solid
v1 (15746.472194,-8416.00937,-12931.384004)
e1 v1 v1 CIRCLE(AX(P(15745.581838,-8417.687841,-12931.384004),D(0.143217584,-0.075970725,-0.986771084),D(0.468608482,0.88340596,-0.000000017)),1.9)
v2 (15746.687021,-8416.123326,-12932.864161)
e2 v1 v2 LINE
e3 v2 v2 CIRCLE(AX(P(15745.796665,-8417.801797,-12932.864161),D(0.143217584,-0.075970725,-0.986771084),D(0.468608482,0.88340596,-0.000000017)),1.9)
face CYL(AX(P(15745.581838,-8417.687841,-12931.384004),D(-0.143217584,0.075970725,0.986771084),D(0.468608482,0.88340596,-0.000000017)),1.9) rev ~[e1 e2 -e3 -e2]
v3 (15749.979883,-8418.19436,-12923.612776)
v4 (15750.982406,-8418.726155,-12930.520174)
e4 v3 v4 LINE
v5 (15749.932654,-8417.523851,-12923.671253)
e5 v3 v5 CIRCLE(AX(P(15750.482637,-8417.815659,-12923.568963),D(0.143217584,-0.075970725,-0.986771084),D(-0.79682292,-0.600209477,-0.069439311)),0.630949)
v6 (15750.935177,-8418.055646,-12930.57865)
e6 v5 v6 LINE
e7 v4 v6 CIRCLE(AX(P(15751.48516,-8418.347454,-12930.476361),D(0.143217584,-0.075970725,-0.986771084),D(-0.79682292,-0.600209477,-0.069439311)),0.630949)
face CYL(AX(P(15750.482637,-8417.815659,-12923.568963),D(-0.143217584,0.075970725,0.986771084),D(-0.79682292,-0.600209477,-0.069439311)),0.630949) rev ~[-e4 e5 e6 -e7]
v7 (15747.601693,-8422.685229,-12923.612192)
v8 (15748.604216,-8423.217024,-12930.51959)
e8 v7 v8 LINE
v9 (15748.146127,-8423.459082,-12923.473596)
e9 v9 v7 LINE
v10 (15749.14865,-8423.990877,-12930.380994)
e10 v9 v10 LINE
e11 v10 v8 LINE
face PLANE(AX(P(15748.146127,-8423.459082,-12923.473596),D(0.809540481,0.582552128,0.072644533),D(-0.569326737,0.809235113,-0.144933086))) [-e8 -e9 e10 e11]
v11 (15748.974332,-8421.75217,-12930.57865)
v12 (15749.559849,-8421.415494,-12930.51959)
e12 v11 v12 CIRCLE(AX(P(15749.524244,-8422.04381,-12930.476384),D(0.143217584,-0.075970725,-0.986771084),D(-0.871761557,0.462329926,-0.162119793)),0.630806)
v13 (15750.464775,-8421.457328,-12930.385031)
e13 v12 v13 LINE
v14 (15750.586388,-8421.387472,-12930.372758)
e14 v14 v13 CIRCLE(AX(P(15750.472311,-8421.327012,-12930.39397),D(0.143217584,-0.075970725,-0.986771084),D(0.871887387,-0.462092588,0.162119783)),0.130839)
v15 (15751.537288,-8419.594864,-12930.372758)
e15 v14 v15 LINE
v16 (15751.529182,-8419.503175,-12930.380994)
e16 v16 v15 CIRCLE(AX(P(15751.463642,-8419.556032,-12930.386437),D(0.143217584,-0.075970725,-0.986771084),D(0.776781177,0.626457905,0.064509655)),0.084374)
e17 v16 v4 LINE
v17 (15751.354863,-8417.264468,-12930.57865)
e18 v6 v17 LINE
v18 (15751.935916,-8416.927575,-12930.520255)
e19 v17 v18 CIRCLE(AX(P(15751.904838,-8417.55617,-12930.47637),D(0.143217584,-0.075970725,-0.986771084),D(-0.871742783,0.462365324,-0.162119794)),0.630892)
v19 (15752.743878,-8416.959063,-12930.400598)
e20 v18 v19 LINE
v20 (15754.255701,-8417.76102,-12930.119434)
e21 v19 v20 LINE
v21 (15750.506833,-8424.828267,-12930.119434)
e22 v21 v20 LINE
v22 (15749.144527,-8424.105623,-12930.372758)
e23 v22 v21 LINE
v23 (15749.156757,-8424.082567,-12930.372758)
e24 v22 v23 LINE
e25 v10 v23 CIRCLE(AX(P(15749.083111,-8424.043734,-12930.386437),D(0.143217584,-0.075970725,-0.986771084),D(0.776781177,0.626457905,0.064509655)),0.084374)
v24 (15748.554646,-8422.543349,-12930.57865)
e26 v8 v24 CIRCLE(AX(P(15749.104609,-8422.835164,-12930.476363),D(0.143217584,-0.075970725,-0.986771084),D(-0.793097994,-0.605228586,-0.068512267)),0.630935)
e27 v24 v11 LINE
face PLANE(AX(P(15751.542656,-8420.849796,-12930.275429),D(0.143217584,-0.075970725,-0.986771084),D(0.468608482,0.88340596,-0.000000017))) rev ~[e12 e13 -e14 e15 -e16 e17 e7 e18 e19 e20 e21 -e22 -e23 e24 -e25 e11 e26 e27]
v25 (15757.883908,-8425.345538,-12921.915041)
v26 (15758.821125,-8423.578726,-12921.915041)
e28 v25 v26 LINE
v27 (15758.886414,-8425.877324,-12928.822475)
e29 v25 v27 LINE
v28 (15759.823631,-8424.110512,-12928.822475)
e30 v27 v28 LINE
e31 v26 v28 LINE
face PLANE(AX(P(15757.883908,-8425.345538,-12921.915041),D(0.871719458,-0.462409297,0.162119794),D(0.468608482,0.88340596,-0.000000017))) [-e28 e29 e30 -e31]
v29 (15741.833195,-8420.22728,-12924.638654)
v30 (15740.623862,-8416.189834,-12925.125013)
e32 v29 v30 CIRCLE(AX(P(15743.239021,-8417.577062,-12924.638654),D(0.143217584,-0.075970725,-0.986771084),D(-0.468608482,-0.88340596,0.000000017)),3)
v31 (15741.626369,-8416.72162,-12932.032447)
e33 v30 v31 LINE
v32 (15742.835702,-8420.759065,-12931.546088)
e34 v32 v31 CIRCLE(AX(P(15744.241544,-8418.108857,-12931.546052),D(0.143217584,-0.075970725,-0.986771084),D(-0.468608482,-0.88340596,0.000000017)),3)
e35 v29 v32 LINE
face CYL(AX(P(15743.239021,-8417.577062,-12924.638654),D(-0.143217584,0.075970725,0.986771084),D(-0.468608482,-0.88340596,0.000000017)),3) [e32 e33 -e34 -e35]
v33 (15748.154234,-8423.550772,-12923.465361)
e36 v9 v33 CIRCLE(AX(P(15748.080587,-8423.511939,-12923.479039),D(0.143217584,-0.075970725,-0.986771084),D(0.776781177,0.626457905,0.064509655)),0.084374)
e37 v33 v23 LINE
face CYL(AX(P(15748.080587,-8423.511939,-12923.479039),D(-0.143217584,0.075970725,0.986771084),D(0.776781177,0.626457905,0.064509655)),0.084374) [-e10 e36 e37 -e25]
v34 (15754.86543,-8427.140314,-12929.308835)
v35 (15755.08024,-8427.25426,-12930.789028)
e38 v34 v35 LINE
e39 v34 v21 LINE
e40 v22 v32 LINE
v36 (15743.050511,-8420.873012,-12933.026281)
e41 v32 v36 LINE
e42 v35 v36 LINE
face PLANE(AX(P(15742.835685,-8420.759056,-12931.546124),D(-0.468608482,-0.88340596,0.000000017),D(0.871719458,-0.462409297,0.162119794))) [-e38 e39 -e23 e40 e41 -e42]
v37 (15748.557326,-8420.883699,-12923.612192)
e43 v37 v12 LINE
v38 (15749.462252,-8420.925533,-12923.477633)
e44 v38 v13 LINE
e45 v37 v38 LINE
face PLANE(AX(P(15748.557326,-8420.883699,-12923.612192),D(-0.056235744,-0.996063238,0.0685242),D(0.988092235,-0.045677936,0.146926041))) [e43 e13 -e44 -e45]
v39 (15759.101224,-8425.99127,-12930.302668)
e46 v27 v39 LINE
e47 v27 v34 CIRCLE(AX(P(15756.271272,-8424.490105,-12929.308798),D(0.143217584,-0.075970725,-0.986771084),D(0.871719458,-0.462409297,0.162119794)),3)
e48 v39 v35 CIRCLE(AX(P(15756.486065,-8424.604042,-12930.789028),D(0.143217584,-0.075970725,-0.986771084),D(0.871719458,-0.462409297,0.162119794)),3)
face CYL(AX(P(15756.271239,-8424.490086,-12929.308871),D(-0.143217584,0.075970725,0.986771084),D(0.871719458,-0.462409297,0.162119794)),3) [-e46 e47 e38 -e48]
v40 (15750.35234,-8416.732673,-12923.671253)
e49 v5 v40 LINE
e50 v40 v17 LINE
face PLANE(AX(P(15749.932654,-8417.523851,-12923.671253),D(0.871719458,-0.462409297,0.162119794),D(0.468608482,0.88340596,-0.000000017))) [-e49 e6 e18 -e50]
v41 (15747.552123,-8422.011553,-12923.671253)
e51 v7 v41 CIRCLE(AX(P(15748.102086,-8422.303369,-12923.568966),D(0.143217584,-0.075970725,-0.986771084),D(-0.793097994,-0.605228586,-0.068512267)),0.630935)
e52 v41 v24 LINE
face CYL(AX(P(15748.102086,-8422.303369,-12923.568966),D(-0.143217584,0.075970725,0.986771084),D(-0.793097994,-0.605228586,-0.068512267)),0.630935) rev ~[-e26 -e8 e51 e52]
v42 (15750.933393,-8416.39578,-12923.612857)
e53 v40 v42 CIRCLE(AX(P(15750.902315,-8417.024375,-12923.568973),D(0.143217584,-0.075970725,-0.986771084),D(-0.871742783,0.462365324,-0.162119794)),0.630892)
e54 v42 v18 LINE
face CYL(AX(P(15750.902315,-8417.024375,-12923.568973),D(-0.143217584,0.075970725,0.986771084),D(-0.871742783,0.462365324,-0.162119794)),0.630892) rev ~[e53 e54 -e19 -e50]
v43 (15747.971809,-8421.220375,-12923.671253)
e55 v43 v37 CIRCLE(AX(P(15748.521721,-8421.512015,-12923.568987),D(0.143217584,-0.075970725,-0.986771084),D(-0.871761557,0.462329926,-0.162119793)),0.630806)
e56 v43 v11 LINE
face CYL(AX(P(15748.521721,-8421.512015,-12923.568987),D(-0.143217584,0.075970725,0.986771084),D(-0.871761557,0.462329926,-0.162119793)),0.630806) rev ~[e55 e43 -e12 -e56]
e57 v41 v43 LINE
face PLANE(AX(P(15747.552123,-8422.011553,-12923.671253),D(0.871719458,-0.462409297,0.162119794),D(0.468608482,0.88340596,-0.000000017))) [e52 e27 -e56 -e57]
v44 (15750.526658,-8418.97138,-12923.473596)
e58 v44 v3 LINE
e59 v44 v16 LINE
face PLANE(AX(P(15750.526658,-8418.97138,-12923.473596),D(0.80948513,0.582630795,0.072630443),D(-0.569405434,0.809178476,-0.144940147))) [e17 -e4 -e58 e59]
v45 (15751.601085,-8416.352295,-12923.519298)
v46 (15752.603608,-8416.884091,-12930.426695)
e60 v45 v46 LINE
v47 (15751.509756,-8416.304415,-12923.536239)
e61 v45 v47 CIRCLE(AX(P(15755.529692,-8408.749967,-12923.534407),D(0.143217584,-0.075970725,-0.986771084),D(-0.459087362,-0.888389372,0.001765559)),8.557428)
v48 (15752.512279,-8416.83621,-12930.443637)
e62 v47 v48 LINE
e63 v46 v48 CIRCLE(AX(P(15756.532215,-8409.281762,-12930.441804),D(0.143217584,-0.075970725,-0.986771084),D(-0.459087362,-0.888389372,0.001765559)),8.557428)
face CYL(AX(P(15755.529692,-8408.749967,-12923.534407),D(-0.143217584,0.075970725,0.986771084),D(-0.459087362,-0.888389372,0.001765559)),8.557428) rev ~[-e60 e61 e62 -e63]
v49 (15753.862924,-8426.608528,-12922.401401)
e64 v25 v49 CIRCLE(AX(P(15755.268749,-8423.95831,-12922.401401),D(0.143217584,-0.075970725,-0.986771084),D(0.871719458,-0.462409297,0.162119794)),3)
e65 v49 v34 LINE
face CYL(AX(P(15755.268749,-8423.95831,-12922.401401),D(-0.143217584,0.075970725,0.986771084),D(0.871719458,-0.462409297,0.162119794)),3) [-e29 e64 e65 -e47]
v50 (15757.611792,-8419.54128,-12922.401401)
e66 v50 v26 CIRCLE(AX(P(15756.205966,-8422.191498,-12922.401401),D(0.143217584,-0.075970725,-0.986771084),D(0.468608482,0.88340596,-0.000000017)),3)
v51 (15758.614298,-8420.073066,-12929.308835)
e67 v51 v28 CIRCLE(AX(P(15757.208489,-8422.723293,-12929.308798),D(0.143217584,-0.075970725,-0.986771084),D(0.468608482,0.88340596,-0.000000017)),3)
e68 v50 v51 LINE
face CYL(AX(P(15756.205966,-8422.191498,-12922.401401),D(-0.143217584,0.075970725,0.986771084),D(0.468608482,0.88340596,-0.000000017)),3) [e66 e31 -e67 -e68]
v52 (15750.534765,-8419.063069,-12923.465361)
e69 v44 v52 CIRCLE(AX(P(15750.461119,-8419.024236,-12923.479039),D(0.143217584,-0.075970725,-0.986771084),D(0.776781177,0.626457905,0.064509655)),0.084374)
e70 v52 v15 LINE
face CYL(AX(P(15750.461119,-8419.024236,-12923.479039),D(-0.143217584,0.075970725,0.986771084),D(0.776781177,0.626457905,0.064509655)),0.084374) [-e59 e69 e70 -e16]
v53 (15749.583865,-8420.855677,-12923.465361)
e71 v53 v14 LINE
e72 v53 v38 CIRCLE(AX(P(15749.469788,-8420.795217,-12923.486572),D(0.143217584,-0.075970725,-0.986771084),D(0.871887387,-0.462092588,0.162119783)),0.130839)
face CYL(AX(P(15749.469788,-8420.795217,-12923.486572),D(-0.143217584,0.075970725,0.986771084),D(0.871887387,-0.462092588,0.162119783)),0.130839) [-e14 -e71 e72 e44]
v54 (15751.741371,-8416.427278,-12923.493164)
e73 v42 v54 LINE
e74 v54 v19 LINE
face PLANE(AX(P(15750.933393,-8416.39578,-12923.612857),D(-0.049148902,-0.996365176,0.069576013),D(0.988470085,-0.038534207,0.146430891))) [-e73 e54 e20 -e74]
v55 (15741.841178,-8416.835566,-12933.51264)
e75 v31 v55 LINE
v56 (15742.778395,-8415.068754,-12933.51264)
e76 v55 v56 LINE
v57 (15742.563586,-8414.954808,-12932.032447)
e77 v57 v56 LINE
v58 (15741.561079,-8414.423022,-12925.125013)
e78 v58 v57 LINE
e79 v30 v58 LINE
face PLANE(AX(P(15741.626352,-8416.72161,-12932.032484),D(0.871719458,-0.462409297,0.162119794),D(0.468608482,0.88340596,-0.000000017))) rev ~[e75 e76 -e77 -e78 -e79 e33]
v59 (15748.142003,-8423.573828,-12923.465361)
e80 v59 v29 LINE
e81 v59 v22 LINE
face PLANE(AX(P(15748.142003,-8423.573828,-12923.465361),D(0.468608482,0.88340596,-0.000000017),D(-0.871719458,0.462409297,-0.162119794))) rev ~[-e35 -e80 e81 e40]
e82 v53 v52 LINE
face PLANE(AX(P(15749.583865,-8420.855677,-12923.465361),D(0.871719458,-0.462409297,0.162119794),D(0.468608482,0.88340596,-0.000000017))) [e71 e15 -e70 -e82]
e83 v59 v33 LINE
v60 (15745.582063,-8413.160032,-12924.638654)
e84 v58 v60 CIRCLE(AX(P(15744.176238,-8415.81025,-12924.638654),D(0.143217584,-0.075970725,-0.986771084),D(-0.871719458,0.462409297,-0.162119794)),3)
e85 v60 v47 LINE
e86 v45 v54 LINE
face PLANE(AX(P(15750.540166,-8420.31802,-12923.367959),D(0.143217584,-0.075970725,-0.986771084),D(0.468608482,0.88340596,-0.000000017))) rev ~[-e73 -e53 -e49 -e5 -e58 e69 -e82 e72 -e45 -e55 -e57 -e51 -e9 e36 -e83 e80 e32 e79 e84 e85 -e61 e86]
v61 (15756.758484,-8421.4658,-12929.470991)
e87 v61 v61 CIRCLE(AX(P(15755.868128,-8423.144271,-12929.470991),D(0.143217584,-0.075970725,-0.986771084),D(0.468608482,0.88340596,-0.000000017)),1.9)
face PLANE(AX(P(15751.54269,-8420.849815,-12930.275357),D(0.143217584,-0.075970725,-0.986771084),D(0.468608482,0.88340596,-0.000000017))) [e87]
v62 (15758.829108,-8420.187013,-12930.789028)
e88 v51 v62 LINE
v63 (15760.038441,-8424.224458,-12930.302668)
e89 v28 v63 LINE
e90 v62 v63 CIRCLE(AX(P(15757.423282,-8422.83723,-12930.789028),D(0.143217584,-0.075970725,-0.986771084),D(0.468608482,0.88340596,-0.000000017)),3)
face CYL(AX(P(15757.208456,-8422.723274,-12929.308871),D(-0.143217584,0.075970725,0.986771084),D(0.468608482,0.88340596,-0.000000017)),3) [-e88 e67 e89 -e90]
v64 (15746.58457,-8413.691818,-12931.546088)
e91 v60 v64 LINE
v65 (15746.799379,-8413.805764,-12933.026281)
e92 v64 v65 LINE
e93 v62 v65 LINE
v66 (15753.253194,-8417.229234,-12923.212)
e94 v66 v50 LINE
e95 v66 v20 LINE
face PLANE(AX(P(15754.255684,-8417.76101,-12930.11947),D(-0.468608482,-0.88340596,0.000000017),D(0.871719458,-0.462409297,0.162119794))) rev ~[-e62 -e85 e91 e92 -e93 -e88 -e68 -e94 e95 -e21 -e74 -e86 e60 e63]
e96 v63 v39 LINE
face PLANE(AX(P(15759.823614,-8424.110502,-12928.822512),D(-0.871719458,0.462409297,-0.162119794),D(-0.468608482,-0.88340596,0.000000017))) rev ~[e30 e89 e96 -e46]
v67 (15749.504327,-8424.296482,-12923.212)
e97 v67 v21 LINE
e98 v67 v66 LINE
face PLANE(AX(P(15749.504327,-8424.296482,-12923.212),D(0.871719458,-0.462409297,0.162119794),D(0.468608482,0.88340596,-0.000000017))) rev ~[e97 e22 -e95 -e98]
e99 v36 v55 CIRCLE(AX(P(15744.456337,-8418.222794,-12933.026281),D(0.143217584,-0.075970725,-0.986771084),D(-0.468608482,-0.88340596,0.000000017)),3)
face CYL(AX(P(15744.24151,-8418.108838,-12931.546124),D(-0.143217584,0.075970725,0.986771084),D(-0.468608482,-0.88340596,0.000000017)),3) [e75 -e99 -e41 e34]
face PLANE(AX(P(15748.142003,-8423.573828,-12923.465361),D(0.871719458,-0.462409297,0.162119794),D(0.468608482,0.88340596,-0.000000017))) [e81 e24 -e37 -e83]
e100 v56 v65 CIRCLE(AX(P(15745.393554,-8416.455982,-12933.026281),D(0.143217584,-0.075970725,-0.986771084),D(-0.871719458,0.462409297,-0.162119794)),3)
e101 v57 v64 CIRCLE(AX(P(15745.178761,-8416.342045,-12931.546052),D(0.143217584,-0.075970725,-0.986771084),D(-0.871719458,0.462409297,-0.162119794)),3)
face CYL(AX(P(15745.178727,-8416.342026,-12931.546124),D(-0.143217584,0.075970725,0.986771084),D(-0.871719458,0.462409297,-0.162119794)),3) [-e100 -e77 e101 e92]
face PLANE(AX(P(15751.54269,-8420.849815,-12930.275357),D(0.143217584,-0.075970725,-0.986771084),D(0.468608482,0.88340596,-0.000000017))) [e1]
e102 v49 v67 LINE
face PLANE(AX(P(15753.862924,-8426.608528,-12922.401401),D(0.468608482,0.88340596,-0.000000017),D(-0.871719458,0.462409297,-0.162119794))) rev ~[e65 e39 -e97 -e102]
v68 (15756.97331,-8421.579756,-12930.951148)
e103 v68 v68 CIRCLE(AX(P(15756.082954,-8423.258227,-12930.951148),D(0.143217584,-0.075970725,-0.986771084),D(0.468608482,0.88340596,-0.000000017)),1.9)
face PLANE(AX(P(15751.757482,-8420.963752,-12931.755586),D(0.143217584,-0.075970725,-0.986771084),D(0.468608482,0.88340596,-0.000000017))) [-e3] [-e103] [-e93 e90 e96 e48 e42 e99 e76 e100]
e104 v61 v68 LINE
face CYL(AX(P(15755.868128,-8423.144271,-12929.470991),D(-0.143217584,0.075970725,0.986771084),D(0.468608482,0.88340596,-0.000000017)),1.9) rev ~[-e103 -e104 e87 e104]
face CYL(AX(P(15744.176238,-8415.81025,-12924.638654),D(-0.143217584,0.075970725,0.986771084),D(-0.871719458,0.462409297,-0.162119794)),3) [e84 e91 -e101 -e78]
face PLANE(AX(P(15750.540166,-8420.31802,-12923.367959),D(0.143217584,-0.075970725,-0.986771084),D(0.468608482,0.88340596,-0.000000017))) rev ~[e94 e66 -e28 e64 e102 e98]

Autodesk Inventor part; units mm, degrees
ref_plane "YZ Plane" through (0, 0, 0) normal (1, 0, 0) x (0, 1, 0)
ref_plane "XZ Plane" through (0, 0, 0) normal (0, 1, 0) x (-1, 0, 0)
ref_plane "Work Plane1" through (-367703.1992, 632830.1242, 533306.3882) normal (-0.7430322, 0.6187428, -0.2550695) x (0.5860721, 0.7855909, 0.1984099)
sketch "Sketch1" plane through (15736.2978, -8215.3634, -12939.6422) normal (-0.8717195, 0.4624093, -0.1621198) x (0.4686085, 0.883406, 0)
  circle A0 centre (-111.4493, -109512.2066) radius 1.9
  circle A1 centre (-105.9197, -109447.9073) radius 1.9
  line L0 (-1, 8.962) -> (1, 8.962)
  arc A2 (-4.0236, -0.3508) -> (-14, 8.962) centre (-14, -1.038) ccw
  arc A3 (-4, -7.838) -> (-1, -10.838) centre (-1, -7.838) ccw
  line L1 (-1, -10.838) -> (1, -10.838)
  arc A4 (1, -10.838) -> (4, -7.838) centre (1, -7.838) ccw
  line L2 (-6.0031, -0.3508) -> (-3.9739, -0.3508)
  line L3 (-421.5485, 0.712) -> (525.8715, 0.712)
  arc A5 (-3.6711, -0.5438) -> (-3.9739, -0.3508) centre (-3.9739, -0.685) ccw
  line L4 (-3.2429, -1.398) -> (-3.6711, -0.5438)
  arc A6 (-3.2429, -1.398) -> (-2.8963, -1.6208) centre (-2.8963, -1.2398) ccw
  line L5 (-2.0007, -1.6208) -> (-2.8963, -1.6208)
  arc A7 (-2.0007, -1.6208) -> (-1.6554, -1.4008) centre (-2.0007, -1.2398) ccw
  line L6 (-1.2684, -0.5708) -> (-1.6554, -1.4008)
  arc A8 (-0.9231, -0.3508) -> (-1.2684, -0.5708) centre (-0.9231, -0.7318) ccw
  line L7 (-0.9231, -0.3508) -> (1.1061, -0.3508)
  arc A9 (1.4089, -0.5438) -> (1.1061, -0.3508) centre (1.1061, -0.685) ccw
  line L8 (1.8384, -1.4008) -> (1.4089, -0.5438)
  arc A10 (1.8384, -1.4008) -> (2.1837, -1.6208) centre (2.1837, -1.2398) ccw
  line L9 (3.0793, -1.6208) -> (2.1837, -1.6208)
  arc A11 (3.0793, -1.6208) -> (3.4234, -1.4033) centre (3.0793, -1.2398) ccw
  line L10 (3.8551, -0.4948) -> (3.4234, -1.4033)
  arc A12 (4.1569, -0.304) -> (3.8551, -0.4948) centre (4.1569, -0.6382) ccw
  line L11 (4.1569, -0.304) -> (6.1861, -0.304)
  arc A13 (-1, 8.962) -> (-4, 5.962) centre (-1, 5.962) ccw
  arc A14 (4, 5.962) -> (1, 8.962) centre (1, 5.962) ccw
  line L12 (-4, -0.6008) -> (-3.9739, -0.6008)
  arc A15 (-3.8967, -0.6516) -> (-3.9739, -0.6008) centre (-3.9739, -0.685) ccw
  line L13 (-3.8967, -0.6516) -> (-3.4682, -1.5065)
  arc A16 (-3.4682, -1.5065) -> (-2.8963, -1.8708) centre (-2.8963, -1.2398) ccw
  line L14 (-2.8963, -1.8708) -> (-2.0007, -1.8708)
  arc A17 (-2.0007, -1.8708) -> (-1.4289, -1.5065) centre (-2.0007, -1.2398) ccw
  line L15 (-1.4289, -1.5065) -> (-1.0418, -0.6765)
  arc A18 (-0.9231, -0.6008) -> (-1.0418, -0.6765) centre (-0.9231, -0.7318) ccw
  line L16 (-0.9231, -0.6008) -> (1.1061, -0.6008)
  arc A19 (1.1833, -0.6516) -> (1.1061, -0.6008) centre (1.1061, -0.685) ccw
  line L17 (1.1833, -0.6516) -> (1.6135, -1.5101)
  arc A20 (1.6135, -1.5101) -> (2.1837, -1.8708) centre (2.1837, -1.2398) ccw
  line L18 (2.1837, -1.8708) -> (3.0793, -1.8708)
  arc A21 (3.0793, -1.8708) -> (3.6492, -1.5106) centre (3.0793, -1.2398) ccw
  line L19 (3.6492, -1.5106) -> (4, -0.7723)
  arc A22 (4.1569, -0.554) -> (4.0809, -0.602) centre (4.1569, -0.6382) ccw
  line L20 (4.1569, -0.554) -> (6.1861, -0.554)
  line L21 (-4, -0.6008) -> (-4, -7.838)
  line L22 (-4, 5.962) -> (-4, 0.962)
  line L23 (-4, 0.712) -> (-4, -0.3508)
  line L24 (-421.5485, 0.962) -> (-4.202, 0.962)
  line L25 (4, 0.962) -> (4, 5.962)
  arc A23 (14, 8.962) -> (4.025, -0.3311) centre (14, -1.038) ccw
  arc A24 (4.0005, -0.9335) -> (4, -1.038) centre (14, -1.038) ccw
  line L26 (4, -7.838) -> (4, -0.7723)
  line L27 (4, -0.3431) -> (4, 0.712)
  line L28 (-4, 0.962) -> (4, 0.962)
  line L29 (4.202, 0.962) -> (525.8715, 0.962)
  point P0 (-116.6614, -15646.3059)
  dimension "d0" = 3
  dimension "d2" = 3
  dimension "d3" = 0.25
extrude "Extrusion1" add sketch "Sketch1" along normal blind 7 contours L0 A14 L25 L28 L22 A13 | L21 L12 A15 L13 A16 L14 A17 L15 A18 L16 A19 L17 A20 L18 A21 L19 L26 A24 A4 L1 A3
sketch "Sketch2" plane through (15730.1957, -8212.1265, -12940.777) normal (-0.8717195, 0.4624093, -0.1621198) x (0.4686085, 0.883406, 0)
  circle A0 centre (0, 4.962) radius 1.9 projected
  line L0 (1, 8.962) -> (-1, 8.962) projected
  arc A1 (-1, 8.962) -> (-4, 5.962) centre (-1, 5.962) ccw projected
  line L1 (-4, 5.962) -> (-4, 0.962) projected
  line L2 (4, 0.962) -> (4, 5.962) projected
  arc A2 (4, 5.962) -> (1, 8.962) centre (1, 5.962) ccw projected
  circle A3 centre (0, -6.838) radius 1.9
  arc A4 (-4, -7.838) -> (-1, -10.838) centre (-1, -7.838) ccw
  line L3 (-1, -10.838) -> (1, -10.838)
  arc A5 (1, -10.838) -> (4, -7.838) centre (1, -7.838) ccw
  line L4 (4, -7.838) -> (4, -0.7723)
  line L5 (4, -0.7723) -> (4, 0.962)
  line L6 (-4, -7.838) -> (-4, 0.962)
  point P0 (-116.6614, -15646.3059)
extrude "Extrusion2" add sketch "Sketch2" along normal blind 1.5
move or copy body "Move Body1" bodies to move or copy 1 copy no rotation origin (0, 0, 0) rotation axis (-0.4686085, -0.883406, 0) rotation angle 90 translate (4249.9407, -2254.4088, -30671.5092)
move or copy body "Move Body2" bodies to move or copy 1 copy no translate (14.9738, 0, -3.187)
move or copy body "Move Body3" bodies to move or copy 1 copy no translate (0, -205.3427, 0)
move or copy body "Move Body4" bodies to move or copy 1 copy no translate (10, 0, 0)
move or copy body "Move Body5" bodies to move or copy 1 copy no translate (-10, 0, 0)
equation "\"d4\" = d3"
properties part number "belt-clamp"
